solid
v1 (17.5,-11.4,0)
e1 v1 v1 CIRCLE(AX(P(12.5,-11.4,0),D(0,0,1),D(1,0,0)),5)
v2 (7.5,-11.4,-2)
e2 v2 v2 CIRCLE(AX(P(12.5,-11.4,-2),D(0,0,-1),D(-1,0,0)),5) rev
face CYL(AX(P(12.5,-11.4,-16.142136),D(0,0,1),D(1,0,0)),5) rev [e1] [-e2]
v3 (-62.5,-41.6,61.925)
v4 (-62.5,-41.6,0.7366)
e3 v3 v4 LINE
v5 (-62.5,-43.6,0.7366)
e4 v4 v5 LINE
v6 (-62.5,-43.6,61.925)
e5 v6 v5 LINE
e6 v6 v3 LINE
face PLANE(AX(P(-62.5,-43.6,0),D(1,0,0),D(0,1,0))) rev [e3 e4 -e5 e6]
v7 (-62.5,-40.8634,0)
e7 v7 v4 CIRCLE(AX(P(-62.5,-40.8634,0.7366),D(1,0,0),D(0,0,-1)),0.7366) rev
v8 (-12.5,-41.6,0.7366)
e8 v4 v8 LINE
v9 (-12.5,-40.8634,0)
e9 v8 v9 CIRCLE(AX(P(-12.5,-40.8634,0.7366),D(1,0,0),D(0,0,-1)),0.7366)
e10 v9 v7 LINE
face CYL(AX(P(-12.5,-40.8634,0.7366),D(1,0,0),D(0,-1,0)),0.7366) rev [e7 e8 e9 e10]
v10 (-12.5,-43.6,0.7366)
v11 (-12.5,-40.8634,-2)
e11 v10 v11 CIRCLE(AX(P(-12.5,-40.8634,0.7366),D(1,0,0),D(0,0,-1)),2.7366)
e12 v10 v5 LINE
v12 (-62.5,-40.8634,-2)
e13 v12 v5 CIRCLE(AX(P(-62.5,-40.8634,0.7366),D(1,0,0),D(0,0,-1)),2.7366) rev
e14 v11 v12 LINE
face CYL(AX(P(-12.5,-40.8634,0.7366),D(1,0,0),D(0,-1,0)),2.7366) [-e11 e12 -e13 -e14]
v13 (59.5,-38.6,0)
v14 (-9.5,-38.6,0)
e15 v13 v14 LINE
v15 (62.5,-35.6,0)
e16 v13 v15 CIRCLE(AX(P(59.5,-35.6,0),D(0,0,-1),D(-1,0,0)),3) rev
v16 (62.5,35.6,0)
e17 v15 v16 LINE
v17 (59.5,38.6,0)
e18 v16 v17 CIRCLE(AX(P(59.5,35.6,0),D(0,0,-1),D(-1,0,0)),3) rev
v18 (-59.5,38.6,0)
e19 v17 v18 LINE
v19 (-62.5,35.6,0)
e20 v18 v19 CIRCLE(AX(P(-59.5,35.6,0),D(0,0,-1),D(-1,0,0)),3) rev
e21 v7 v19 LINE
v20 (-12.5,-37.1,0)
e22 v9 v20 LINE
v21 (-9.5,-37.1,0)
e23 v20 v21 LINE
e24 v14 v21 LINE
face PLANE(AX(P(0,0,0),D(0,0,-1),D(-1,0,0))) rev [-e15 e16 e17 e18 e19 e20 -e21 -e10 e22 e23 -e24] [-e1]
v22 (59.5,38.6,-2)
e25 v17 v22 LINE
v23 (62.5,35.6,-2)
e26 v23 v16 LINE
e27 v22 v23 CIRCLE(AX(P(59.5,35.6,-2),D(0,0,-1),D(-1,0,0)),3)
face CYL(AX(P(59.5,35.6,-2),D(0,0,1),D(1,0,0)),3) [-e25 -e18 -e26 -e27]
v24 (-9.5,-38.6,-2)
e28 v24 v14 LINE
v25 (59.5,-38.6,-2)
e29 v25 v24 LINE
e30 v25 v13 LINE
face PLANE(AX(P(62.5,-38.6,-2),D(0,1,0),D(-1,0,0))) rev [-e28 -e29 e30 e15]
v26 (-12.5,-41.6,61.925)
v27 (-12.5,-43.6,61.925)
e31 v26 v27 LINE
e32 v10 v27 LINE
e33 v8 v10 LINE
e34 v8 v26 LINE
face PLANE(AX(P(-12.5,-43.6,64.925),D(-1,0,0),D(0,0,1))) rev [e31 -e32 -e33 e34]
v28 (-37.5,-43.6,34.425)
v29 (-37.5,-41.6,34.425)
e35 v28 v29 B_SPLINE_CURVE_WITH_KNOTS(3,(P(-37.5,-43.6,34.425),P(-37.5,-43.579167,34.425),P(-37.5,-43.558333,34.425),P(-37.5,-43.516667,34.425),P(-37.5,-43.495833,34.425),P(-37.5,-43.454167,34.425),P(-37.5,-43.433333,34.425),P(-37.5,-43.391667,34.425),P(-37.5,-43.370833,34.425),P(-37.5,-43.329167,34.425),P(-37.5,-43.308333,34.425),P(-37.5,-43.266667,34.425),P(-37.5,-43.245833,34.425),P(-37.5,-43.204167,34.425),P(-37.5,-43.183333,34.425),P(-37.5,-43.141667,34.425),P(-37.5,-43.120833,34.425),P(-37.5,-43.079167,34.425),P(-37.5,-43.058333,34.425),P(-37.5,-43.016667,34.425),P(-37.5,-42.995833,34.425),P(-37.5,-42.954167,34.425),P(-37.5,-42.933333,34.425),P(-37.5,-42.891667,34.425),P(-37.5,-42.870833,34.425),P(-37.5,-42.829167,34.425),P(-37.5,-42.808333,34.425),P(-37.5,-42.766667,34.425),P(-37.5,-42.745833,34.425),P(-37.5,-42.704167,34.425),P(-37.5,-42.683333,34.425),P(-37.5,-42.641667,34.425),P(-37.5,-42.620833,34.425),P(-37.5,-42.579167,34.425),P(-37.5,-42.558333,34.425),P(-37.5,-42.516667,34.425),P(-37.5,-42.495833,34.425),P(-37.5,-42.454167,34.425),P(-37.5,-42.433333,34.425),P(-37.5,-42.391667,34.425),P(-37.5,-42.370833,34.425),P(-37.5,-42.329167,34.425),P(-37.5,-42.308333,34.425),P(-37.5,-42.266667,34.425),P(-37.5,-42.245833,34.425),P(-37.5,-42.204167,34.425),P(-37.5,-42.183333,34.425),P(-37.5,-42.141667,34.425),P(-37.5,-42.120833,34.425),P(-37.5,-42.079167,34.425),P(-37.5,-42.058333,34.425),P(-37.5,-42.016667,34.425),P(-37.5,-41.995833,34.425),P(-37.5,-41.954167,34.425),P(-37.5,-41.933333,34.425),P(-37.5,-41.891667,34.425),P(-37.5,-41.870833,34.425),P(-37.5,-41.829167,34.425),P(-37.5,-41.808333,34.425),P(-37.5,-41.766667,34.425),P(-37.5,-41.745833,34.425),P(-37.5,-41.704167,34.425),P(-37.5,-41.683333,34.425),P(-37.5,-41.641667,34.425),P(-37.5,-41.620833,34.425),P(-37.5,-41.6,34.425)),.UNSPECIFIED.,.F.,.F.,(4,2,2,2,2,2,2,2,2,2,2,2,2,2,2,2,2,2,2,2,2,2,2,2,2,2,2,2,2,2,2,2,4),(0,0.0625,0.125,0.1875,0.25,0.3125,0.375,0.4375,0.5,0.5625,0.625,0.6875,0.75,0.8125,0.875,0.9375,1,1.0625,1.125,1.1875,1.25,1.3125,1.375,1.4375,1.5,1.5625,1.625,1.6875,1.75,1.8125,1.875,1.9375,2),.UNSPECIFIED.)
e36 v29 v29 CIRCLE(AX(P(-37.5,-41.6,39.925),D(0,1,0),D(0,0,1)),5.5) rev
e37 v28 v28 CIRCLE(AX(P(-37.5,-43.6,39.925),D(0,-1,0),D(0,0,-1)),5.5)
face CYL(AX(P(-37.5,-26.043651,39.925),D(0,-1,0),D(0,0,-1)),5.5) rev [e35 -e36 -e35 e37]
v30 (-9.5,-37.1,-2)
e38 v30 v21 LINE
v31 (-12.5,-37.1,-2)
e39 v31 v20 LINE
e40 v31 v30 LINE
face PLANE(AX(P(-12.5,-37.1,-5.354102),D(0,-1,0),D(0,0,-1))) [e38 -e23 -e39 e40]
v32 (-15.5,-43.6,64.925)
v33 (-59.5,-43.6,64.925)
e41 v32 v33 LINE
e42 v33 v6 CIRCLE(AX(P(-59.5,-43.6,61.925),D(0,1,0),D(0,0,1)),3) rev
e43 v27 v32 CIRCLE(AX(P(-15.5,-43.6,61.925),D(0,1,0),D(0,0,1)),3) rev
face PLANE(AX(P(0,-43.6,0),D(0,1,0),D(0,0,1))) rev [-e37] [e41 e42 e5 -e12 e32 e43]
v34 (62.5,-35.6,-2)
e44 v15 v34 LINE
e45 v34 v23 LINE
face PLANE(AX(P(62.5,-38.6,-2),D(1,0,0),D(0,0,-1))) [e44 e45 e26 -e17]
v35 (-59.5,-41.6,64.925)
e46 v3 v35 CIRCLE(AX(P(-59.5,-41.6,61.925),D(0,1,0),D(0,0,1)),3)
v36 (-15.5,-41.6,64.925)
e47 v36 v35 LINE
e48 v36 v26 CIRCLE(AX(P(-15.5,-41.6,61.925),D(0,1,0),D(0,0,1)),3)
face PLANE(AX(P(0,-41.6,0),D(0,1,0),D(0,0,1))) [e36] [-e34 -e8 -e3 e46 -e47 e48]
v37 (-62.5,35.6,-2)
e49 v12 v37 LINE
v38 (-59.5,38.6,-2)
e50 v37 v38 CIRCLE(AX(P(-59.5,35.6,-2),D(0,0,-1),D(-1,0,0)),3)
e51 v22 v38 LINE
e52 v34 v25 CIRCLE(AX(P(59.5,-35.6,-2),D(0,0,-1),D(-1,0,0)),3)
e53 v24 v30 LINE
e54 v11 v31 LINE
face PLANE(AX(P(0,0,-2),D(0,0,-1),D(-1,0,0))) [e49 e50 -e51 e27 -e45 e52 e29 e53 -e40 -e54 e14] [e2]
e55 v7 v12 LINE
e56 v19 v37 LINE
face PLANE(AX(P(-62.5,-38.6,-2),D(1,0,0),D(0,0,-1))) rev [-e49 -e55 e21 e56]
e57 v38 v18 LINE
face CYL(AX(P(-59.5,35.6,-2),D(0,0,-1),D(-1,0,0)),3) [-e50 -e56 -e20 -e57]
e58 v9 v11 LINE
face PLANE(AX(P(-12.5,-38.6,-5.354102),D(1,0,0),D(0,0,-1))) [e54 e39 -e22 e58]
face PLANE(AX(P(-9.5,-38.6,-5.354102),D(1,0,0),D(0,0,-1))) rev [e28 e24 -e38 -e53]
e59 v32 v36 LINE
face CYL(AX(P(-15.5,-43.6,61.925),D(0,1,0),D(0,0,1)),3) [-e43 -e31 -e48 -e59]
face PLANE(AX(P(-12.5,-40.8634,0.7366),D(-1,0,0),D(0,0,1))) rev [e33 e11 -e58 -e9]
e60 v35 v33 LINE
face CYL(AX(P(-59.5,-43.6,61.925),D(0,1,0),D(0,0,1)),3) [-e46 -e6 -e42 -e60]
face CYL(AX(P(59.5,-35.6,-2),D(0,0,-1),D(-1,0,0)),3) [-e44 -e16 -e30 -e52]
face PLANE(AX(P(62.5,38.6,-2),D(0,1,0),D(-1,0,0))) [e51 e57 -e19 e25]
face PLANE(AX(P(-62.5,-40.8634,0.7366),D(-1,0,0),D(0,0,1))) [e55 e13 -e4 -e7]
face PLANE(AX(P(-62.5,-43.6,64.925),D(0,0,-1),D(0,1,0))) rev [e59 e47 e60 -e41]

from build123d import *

# Parameters (mm, degrees)
SKETCH2_W          = 125
SKETCH2_H          = 77.2
BASE_FLANGE1_DEPTH = 2
SKETCH2_3_W        = 3
SKETCH2_3_H        = 1.5
CUT_EXTRUDE1_DEPTH = 2
EDGE_FLANGE1_DEPTH = 50
SKETCH2_4_R        = 5
CUT_EXTRUDE2_DEPTH = 2
SKETCH12_R         = 5.5
CUT_EXTRUDE3_DEPTH = 2
FILLET1_R          = 3


# Sheet-metal steps are written as plain solids
with BuildPart() as part:
    # Sketch2 → Base-Flange1 (new body)
    with BuildSketch(Plane.XY):
        Rectangle(SKETCH2_W, SKETCH2_H)
    extrude(amount=-BASE_FLANGE1_DEPTH)

    # Sketch2<3> → Cut-Extrude1 (cut)
    with BuildSketch(Plane.XY):
        with Locations((-11, -37.85)):
            Rectangle(SKETCH2_3_W, SKETCH2_3_H)
    extrude(amount=-CUT_EXTRUDE1_DEPTH, mode=Mode.SUBTRACT)

    # Edge-Flange1 section (across the edge) → Edge-Flange1 (add)
    with BuildSketch(Plane(origin=(-62.5, -43.6, 0), x_dir=(0, 1, 0), z_dir=(1, 0, 0))):
        with BuildLine():
            Line((0, 0.7366), (0, 64.925))
            Line((0, 64.925), (2, 64.925))
            Line((2, 64.925), (2, 0.7366))
            ThreePointArc((2, 0.7366), (2.215745145, 0.215745145), (2.7366, 0))
            Line((2.7366, 0), (5, 0))
            Line((5, 0), (5, -2))
            Line((5, -2), (2.7366, -2))
            ThreePointArc((2.7366, -2), (0.801531583, -1.198468417), (0, 0.7366))
        make_face()
    extrude(amount=EDGE_FLANGE1_DEPTH)

    # Sketch2<4> → Cut-Extrude2 (cut)
    with BuildSketch(Plane.XY):
        with Locations((12.5, -11.4)):
            Circle(SKETCH2_4_R)
    extrude(amount=-CUT_EXTRUDE2_DEPTH, mode=Mode.SUBTRACT)

    # Sketch12 → Cut-Extrude3 (cut)
    with BuildSketch(Plane.XZ.offset(43.6)):
        with Locations(Location((-37.5, 39.925, 0), (0, 0, 270))):
            Circle(SKETCH12_R)
    extrude(amount=-CUT_EXTRUDE3_DEPTH, mode=Mode.SUBTRACT)

    # Fillet1
    fillet1_edges = [part.edges().sort_by_distance(p)[0] for p in [
        (-62.5, -42.6, 64.925),
        (-12.5, -42.6, 64.925),
        (62.5, 38.6, -1),
        (62.5, -38.6, -1),
        (-62.5, 38.6, -1),
    ]]
    fillet(fillet1_edges, radius=FILLET1_R)


solid = part.part
